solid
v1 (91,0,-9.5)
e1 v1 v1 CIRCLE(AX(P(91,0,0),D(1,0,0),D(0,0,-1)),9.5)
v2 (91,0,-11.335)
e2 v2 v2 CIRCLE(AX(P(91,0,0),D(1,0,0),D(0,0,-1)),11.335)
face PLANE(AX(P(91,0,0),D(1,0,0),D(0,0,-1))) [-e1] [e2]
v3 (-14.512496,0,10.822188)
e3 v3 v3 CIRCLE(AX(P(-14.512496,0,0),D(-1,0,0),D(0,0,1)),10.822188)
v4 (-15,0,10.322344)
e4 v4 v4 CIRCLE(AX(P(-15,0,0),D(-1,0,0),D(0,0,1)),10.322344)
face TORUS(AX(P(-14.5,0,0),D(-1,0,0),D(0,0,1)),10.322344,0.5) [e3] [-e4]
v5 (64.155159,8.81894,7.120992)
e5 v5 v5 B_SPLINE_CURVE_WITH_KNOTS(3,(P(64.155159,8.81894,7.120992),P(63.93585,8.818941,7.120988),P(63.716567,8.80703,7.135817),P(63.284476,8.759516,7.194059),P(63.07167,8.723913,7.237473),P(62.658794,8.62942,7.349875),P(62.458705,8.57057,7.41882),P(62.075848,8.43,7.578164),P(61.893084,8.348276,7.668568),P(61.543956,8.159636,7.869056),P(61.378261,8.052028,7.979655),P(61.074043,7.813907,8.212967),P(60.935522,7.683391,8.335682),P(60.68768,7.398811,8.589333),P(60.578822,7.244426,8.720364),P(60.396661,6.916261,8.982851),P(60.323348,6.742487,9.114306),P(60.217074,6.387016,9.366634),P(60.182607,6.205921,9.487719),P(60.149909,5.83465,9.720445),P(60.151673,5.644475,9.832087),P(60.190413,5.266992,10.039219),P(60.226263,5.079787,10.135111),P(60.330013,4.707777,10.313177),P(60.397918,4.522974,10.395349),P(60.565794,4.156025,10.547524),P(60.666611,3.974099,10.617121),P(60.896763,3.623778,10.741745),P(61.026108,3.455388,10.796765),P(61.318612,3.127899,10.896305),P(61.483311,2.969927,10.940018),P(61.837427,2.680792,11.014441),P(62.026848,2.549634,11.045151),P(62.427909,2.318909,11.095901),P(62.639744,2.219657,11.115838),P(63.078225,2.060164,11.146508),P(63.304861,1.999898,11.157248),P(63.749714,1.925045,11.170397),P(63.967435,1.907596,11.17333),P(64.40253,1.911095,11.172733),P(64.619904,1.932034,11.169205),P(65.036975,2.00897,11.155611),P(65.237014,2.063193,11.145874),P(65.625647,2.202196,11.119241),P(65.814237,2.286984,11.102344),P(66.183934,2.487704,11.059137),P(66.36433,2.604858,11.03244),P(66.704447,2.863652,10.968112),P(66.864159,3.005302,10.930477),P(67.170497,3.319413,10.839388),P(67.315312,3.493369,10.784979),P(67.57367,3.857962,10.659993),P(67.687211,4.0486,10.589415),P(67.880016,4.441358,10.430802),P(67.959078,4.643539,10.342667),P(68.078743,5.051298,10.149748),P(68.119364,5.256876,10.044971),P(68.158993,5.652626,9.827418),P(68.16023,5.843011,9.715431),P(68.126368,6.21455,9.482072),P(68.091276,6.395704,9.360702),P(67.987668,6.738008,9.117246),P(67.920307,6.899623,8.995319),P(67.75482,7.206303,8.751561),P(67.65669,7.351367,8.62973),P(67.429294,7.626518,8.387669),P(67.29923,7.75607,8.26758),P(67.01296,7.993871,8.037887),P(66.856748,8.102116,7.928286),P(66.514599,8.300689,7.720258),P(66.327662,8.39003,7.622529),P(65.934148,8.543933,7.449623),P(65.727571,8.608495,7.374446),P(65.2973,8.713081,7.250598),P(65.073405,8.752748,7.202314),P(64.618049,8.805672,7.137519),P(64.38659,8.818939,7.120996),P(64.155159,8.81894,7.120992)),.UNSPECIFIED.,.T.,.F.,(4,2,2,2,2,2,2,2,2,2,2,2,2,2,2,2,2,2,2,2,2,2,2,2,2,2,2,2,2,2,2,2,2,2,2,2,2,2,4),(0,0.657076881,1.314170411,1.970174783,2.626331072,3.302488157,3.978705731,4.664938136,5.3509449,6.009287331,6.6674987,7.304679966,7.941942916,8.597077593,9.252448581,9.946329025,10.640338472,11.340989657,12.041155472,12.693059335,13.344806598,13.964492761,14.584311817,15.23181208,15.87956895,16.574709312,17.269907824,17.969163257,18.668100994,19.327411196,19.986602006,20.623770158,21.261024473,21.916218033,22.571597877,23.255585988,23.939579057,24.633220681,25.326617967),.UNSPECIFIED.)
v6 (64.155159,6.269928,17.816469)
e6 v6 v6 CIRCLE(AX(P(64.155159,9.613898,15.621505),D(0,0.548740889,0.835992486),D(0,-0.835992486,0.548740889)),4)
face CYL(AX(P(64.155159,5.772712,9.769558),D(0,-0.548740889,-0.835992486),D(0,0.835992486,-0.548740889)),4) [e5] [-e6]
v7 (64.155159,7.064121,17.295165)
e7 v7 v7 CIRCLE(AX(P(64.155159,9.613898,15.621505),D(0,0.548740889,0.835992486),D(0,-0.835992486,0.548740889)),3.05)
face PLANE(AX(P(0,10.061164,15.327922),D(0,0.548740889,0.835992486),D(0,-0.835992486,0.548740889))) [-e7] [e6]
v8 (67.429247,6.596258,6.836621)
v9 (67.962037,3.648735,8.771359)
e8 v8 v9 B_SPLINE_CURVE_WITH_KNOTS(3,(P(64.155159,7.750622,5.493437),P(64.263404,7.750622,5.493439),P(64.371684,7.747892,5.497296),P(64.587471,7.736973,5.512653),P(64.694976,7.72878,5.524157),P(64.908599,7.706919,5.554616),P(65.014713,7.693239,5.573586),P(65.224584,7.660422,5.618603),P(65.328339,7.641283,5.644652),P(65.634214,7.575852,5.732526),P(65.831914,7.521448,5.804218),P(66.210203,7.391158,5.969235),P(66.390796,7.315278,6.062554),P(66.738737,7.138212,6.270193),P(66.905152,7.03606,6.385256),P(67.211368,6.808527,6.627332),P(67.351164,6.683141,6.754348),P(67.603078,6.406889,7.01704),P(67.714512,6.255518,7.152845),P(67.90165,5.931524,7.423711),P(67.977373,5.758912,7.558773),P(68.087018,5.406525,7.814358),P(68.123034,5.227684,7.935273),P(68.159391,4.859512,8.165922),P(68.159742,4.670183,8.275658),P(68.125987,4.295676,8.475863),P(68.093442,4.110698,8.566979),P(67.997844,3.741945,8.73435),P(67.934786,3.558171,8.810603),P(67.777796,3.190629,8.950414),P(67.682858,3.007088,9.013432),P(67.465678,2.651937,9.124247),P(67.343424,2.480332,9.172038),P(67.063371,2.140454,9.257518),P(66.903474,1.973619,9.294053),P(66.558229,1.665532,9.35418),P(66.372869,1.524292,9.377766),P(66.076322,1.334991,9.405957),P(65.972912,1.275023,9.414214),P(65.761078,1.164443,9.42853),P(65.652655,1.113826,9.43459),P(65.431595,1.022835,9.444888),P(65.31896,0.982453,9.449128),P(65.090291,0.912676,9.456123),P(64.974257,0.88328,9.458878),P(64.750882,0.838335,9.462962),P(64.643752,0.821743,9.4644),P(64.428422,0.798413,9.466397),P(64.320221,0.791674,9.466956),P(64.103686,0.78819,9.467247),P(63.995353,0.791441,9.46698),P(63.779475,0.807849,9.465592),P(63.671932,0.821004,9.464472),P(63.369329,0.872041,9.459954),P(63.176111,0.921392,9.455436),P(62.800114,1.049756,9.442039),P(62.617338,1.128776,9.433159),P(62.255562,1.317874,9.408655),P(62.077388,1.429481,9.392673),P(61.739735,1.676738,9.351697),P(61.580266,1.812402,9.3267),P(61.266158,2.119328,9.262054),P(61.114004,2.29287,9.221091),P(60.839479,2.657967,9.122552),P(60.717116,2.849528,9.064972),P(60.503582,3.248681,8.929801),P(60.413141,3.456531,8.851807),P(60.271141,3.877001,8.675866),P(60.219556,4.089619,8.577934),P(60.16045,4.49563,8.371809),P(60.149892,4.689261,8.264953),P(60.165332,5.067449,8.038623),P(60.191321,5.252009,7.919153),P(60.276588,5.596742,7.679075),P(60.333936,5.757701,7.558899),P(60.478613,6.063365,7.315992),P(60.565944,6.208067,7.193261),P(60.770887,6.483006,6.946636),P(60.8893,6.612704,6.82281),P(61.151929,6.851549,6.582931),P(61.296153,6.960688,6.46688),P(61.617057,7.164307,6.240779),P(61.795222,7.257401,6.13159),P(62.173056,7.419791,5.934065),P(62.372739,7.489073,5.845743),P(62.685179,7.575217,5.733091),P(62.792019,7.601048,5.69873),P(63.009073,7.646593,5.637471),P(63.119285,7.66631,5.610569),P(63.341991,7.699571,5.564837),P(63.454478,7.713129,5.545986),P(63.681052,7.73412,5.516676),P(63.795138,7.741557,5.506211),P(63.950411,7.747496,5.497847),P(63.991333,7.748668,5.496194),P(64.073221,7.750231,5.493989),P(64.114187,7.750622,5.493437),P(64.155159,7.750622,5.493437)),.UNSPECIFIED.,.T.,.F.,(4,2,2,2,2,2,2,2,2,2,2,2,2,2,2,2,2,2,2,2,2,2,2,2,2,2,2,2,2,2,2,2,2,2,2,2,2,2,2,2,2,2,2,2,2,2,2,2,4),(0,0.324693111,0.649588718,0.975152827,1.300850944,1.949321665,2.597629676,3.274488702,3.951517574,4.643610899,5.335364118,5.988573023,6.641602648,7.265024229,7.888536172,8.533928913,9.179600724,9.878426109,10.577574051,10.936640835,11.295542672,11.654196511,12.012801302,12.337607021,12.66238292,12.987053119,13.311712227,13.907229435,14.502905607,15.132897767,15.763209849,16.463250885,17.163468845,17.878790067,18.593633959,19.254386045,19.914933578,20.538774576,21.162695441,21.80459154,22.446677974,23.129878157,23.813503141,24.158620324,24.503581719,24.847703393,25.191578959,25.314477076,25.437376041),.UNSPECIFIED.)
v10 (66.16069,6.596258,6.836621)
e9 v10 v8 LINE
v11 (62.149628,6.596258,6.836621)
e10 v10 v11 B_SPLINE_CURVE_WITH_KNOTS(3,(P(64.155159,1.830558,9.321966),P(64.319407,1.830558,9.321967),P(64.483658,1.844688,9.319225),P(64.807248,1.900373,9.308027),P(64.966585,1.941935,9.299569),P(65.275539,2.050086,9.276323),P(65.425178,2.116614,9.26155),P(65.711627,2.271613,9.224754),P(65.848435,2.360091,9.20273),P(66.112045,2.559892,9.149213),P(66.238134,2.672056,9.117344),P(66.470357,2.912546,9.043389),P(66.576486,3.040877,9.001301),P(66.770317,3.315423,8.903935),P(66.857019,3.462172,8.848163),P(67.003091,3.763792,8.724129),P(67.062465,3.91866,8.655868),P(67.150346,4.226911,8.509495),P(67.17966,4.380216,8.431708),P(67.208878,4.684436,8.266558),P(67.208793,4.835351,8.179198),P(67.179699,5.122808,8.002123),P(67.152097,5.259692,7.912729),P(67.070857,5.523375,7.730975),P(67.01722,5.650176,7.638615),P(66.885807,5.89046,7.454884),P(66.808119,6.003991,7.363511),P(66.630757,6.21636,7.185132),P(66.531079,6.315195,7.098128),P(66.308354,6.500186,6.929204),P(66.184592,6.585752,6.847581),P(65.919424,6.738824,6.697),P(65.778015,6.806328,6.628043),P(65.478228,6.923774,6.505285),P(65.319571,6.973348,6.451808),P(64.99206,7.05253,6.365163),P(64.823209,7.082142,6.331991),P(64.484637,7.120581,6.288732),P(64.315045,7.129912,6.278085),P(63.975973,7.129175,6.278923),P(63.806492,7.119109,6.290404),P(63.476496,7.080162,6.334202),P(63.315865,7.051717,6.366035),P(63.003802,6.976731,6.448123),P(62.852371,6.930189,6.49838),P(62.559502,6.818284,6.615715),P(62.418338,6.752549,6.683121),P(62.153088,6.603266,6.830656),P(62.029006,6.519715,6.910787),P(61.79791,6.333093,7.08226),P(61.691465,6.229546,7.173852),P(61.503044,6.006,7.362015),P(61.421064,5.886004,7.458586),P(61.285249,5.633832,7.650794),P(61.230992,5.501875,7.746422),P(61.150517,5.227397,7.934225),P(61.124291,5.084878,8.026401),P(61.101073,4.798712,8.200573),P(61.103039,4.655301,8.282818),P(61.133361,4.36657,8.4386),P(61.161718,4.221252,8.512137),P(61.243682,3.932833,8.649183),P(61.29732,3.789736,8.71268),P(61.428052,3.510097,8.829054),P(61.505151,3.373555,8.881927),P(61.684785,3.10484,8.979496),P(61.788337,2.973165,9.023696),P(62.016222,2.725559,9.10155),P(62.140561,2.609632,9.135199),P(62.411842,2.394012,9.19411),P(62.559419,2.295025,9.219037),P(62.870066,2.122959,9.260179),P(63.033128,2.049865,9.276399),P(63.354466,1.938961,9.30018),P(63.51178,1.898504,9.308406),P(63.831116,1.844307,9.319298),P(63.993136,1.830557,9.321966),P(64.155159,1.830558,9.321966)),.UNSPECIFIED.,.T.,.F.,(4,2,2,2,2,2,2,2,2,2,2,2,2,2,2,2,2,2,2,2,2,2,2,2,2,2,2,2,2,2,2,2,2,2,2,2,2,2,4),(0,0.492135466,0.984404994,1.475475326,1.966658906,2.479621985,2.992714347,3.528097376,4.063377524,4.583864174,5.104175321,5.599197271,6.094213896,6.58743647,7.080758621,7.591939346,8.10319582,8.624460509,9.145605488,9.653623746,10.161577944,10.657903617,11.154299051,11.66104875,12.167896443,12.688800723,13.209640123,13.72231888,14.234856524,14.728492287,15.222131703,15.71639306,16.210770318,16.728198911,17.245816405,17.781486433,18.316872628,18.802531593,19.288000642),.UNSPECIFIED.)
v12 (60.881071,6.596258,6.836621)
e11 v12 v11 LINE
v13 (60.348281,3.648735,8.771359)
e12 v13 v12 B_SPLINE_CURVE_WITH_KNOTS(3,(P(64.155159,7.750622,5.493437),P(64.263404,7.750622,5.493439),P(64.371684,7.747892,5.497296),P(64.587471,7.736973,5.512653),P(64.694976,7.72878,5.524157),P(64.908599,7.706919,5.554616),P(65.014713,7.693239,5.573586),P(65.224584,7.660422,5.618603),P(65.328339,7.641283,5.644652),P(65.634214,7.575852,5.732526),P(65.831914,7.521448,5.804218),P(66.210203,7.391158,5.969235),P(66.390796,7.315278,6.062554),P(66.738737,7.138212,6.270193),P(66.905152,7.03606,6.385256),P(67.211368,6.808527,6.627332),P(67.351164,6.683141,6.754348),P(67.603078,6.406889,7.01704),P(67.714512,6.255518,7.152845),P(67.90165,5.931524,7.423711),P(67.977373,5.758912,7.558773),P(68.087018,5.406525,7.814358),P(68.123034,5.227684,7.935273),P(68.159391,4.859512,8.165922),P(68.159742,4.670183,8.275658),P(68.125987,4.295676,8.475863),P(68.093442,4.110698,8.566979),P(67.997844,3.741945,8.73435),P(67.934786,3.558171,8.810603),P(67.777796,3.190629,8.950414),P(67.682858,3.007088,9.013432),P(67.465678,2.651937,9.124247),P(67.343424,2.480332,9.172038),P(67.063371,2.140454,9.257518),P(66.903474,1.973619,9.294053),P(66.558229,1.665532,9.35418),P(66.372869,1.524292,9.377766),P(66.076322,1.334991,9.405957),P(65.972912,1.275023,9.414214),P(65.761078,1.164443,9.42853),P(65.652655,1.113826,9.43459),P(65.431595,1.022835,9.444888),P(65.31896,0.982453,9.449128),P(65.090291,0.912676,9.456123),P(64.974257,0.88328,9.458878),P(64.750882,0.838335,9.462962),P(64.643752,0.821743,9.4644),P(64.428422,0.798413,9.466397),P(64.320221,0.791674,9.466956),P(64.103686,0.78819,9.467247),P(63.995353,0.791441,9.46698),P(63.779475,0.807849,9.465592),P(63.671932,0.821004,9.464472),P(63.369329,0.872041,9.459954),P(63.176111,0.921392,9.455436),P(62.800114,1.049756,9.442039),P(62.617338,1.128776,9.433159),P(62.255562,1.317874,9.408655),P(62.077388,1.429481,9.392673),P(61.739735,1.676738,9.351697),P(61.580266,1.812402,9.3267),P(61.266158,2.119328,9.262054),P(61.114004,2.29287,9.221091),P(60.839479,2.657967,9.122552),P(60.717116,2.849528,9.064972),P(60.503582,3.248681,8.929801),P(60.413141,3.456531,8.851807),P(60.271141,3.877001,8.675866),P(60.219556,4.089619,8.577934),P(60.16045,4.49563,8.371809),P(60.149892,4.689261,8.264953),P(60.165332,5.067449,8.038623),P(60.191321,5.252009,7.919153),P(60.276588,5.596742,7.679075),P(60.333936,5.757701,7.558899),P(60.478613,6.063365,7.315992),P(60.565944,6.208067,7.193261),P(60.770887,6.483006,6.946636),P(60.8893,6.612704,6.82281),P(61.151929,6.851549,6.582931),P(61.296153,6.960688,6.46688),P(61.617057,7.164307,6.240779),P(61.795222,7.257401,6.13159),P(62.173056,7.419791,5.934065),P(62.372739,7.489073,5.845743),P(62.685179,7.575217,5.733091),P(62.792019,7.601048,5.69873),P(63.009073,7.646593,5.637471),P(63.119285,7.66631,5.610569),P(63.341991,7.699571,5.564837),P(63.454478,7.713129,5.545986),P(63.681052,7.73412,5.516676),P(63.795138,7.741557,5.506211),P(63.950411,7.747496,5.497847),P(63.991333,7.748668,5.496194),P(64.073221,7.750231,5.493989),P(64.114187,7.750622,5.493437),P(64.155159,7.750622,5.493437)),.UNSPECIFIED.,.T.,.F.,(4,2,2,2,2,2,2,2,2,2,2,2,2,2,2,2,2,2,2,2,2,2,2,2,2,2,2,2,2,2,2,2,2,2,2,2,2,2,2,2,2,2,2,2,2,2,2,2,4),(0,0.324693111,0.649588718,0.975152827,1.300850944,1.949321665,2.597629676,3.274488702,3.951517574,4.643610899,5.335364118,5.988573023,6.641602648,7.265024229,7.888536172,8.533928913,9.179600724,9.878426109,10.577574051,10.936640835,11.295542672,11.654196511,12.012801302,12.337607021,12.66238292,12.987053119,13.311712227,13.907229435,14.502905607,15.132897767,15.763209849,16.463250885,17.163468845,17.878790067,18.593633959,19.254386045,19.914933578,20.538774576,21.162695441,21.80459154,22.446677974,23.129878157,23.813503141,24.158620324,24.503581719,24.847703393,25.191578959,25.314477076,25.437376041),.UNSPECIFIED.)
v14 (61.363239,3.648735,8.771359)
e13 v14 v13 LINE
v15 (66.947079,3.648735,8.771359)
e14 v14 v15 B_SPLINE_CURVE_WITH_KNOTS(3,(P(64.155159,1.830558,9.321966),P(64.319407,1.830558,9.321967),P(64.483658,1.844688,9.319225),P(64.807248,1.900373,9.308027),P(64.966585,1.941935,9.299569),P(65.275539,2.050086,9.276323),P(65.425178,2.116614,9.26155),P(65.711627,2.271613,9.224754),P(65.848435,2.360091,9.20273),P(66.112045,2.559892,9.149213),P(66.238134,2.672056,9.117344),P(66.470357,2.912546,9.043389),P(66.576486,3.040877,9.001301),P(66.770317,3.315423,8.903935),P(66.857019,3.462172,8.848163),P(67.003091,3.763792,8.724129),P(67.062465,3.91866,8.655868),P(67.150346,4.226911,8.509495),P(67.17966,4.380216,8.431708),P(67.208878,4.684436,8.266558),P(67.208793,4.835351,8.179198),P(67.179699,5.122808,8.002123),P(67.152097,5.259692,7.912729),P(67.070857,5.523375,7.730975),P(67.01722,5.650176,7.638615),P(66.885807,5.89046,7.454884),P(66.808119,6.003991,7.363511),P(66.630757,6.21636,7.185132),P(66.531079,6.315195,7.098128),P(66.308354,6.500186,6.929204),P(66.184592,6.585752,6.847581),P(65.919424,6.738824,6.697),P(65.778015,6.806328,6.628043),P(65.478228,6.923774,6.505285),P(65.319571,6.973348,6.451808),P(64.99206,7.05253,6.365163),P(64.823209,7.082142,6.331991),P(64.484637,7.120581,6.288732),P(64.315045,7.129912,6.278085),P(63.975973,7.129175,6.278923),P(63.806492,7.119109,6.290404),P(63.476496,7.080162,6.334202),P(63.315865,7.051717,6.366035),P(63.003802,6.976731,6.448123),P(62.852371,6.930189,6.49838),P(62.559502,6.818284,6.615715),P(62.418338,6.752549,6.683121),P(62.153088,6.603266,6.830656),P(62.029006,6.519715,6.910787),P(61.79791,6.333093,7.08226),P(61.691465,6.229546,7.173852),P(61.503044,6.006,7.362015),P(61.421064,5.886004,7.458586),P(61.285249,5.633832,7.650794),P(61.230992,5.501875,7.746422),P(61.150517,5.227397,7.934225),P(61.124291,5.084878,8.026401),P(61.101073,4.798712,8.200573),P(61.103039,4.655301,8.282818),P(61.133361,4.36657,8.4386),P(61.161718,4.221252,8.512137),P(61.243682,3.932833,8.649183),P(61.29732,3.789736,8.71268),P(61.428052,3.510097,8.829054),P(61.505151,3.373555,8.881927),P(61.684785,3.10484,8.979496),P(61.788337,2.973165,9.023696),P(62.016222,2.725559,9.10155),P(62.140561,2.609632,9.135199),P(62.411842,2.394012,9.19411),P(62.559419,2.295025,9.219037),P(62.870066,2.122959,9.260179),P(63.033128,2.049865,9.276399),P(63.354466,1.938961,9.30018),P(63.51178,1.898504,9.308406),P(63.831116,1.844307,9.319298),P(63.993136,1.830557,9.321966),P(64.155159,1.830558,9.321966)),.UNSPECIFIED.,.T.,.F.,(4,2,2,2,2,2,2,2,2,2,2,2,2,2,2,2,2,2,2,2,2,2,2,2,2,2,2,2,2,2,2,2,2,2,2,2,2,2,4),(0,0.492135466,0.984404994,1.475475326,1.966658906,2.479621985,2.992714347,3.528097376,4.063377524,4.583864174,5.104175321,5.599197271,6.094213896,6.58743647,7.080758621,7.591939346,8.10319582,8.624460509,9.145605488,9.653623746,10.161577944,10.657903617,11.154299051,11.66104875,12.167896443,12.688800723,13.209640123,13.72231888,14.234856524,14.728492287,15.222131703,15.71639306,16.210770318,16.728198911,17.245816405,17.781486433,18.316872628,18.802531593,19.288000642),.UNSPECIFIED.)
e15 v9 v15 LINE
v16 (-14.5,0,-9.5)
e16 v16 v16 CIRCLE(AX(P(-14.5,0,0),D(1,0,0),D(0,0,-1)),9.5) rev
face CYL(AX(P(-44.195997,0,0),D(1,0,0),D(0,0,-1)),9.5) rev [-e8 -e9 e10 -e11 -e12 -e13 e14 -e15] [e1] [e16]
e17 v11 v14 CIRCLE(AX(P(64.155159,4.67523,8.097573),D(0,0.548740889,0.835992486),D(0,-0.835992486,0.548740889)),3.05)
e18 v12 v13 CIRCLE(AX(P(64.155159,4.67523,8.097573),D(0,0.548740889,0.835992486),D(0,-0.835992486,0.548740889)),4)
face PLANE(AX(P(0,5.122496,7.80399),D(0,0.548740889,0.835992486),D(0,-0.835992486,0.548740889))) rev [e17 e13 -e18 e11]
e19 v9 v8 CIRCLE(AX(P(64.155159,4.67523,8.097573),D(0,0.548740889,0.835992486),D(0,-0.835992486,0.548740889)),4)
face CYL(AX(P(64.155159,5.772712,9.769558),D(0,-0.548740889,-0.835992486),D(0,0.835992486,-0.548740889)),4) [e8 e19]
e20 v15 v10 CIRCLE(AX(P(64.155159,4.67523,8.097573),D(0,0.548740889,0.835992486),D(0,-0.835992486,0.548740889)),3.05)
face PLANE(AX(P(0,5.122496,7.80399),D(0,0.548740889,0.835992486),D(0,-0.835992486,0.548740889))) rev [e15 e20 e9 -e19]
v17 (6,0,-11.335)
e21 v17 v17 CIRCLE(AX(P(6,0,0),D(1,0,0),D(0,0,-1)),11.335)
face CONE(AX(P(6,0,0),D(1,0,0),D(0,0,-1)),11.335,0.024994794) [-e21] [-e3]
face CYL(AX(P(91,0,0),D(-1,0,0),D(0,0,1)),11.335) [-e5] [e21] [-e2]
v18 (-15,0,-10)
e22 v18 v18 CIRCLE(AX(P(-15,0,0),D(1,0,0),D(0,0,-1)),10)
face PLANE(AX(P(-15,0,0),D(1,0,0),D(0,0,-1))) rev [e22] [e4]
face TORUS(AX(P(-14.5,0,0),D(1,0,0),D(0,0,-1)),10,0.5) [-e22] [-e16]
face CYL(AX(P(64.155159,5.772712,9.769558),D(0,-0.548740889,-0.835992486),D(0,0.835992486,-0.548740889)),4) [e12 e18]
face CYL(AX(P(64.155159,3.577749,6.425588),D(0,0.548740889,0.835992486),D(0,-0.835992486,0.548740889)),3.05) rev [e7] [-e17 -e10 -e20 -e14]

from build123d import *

# Parameters (mm, degrees)
BOSS_EXTRUDE1_START = -21
SKETCH2_R           = 10.322343774
SKETCH2_R_2         = 9.5
BOSS_EXTRUDE1_DEPTH = 21
FILLET1_R           = 0.5
SKETCH3_R           = 11.335
SKETCH3_R_2         = 9.5
BOSS_EXTRUDE2_DEPTH = 85
BOSS_EXTRUDE3_START = 9.334999999
BOSS_EXTRUDE3_DEPTH = 8.999999999
SKETCH5_R           = 3.050000003
CUT_EXTRUDE1_DEPTH  = 11


# Read off the part's stored shape, not the designer's step: Boss-Extrude3
with BuildPart() as part:
    # Sketch1 → Revolve1 (revolve)
    with BuildSketch(Plane.XY, mode=Mode.PRIVATE) as revolve1_sk:
        with BuildLine():
            Line((6, 11.335), (-14.512496096, 10.822187598))
            ThreePointArc((-14.512496096, 10.822187598), (-14.857944163, 10.671451174), (-15, 10.322343774))
            Line((-15, 10.322343774), (6, 10.322343774))
            Line((6, 10.322343774), (6, 11.335))
        make_face()
    revolve(revolve1_sk.sketch.rotate(Axis((-15.624243475, 0, 0), (1, 0, 0)), 90), axis=Axis((-15.624243475, 0, 0), (1, 0, 0)))

    # Sketch2 → Boss-Extrude1 (add)
    with BuildSketch(Plane(origin=(6, 0, 0), x_dir=(0, 0, -1), z_dir=(1, 0, 0)).offset(BOSS_EXTRUDE1_START)):
        Circle(SKETCH2_R)
        Circle(SKETCH2_R_2, mode=Mode.SUBTRACT)
    extrude(amount=BOSS_EXTRUDE1_DEPTH)

    # Fillet1
    fillet1_edges = [part.edges().sort_by_distance(p)[0] for p in [
        (-15, 0, 9.5),
    ]]
    fillet(fillet1_edges, radius=FILLET1_R)

    # Sketch3 → Boss-Extrude2 (add)
    with BuildSketch(Plane(origin=(6, 0, 0), x_dir=(0, 0, -1), z_dir=(1, 0, 0))):
        Circle(SKETCH3_R)
        Circle(SKETCH3_R_2, mode=Mode.SUBTRACT)
    extrude(amount=BOSS_EXTRUDE2_DEPTH)

    # Boss-Extrude3 outline → Boss-Extrude3 (add)
    with BuildSketch(Plane(origin=(0, 0, 0), x_dir=(1, 0, 0), z_dir=(0, 0.5487408887134131, 0.8359924862425581)).offset(BOSS_EXTRUDE3_START)):
        with BuildLine():
            ThreePointArc((60.34828113, -1.762888304), (68.110256528, -1.132677071), (60.881070562, 1.762888255))
            ThreePointArc((60.881070562, 1.762888255), (60.200061526, 0.062653443), (60.34828113, -1.762888304))
        make_face()
    extrude(amount=BOSS_EXTRUDE3_DEPTH)

    # Sketch5 → Cut-Extrude1 (cut)
    with BuildSketch(Plane(origin=(0, 10.061164202, 15.32792223), x_dir=(1, 0, 0), z_dir=(1.7486012637846212e-15, 0.5487408891490924, 0.8359924859565806))):
        with Locations(Location((64.155159027, -0.535011823, 0), (0, 0, 270))):
            Circle(SKETCH5_R)
    extrude(amount=-CUT_EXTRUDE1_DEPTH, mode=Mode.SUBTRACT)


solid = part.part
